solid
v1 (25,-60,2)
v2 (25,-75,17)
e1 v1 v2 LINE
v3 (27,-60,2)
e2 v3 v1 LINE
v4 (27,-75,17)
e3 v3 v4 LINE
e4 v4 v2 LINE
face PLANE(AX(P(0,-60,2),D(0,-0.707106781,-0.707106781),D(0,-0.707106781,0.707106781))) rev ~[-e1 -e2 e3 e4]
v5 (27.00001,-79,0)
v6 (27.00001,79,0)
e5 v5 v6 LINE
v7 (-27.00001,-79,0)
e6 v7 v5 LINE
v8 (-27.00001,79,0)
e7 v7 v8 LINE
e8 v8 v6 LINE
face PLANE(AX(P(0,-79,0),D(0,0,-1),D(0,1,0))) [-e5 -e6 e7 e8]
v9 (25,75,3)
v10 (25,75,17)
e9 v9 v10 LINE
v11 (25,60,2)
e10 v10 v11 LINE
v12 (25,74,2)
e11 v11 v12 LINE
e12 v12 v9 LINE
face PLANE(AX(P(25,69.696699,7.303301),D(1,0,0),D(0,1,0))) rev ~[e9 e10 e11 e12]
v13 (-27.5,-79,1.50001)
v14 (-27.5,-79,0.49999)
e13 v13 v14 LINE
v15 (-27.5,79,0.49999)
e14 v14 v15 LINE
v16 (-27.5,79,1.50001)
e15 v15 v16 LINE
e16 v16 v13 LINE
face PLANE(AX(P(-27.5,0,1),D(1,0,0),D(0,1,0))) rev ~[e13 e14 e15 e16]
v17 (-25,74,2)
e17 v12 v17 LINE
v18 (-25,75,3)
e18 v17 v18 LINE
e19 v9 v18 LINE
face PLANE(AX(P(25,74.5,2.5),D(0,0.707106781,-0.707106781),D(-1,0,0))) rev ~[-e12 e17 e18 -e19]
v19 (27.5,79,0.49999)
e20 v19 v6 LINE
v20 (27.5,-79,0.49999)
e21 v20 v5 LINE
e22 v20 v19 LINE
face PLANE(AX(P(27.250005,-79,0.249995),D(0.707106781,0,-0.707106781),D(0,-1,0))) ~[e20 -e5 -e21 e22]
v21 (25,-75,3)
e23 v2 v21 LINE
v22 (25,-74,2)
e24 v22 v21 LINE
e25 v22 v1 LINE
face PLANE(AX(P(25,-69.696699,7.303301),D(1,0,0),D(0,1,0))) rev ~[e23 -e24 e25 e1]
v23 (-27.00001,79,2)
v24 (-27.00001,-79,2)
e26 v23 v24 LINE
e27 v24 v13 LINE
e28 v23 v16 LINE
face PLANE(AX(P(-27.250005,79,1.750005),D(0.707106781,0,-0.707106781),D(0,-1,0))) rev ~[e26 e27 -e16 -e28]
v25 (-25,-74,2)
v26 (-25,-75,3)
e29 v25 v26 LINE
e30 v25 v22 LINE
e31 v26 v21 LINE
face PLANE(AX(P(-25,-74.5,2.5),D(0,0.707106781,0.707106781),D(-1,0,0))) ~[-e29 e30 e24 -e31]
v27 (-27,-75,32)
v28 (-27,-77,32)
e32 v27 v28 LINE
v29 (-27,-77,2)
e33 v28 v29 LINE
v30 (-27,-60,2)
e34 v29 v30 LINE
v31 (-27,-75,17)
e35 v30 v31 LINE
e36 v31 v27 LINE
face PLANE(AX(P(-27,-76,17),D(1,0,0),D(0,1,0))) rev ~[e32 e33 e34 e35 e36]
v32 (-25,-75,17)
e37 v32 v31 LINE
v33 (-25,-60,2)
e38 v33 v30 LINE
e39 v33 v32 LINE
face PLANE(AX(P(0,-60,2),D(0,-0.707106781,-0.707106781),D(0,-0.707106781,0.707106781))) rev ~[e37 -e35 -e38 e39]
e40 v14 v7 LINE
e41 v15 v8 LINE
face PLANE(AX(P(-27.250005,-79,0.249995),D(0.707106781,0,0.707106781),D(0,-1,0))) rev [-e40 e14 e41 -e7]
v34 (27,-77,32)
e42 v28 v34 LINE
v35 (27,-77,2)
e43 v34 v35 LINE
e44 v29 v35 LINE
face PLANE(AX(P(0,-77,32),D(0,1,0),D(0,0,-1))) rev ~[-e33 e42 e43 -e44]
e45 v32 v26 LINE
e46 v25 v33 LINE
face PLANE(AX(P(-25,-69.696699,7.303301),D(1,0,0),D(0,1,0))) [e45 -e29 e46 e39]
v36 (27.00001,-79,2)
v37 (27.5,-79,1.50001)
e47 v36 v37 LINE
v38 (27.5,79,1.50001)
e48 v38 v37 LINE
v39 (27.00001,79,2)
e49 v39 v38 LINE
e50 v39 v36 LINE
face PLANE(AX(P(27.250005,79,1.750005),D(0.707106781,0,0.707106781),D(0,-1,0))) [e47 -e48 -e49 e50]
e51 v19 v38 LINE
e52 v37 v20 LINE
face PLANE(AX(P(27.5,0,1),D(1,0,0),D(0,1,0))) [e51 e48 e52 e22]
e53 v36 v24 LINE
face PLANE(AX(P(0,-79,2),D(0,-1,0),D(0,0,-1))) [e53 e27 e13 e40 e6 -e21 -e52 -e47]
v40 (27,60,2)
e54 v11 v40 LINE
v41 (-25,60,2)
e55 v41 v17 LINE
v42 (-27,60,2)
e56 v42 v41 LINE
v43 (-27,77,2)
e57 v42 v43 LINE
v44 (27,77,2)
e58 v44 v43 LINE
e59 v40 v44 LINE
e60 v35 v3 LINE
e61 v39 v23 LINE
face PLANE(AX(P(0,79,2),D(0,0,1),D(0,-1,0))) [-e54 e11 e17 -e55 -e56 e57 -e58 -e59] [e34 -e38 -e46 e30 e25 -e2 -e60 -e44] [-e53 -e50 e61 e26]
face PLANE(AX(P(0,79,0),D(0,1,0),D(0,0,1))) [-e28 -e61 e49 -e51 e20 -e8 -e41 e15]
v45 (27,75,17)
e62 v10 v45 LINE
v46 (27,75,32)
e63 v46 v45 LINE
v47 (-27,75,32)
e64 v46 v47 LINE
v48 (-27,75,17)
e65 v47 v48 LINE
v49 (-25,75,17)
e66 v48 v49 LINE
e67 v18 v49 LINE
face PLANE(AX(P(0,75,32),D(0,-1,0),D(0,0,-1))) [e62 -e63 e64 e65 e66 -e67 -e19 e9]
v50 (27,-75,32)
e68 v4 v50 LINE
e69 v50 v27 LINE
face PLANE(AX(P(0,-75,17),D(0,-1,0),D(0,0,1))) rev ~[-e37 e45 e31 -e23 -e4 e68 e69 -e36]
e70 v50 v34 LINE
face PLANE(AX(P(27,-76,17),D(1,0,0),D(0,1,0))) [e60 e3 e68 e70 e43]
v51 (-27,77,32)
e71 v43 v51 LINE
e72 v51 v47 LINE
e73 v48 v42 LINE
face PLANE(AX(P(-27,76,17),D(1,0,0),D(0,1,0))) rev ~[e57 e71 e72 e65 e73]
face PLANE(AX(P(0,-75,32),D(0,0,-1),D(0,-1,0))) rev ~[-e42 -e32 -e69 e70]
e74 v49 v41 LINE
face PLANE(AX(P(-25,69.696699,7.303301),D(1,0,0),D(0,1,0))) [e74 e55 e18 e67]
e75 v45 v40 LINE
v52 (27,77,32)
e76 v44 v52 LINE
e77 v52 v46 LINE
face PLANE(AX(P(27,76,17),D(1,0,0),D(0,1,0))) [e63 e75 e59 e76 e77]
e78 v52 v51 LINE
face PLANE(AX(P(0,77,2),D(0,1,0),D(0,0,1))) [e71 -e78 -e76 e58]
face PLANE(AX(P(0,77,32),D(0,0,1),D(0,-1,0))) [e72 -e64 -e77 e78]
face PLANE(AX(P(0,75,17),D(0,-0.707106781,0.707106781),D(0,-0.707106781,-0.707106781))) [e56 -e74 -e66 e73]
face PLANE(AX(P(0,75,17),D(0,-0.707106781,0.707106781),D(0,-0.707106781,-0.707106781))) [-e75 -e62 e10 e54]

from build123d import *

# Parameters (mm, degrees)
F4_DEPTH = 27.5
F5_DEPTH = 27
F6_DEPTH = 25
F7_SIZE  = 1
F8_SIZE  = 0.49999


# Not quite as in the source:
# - a fillet or chamfer is up to 0.001 mm smaller than in the source, because OpenCascade refuses the exact size


with BuildPart() as f4:
    # F3 (on Right) → F4 (new body, symmetric)
    with BuildSketch(Plane.YZ):
        Polygon((-75, 2), (-77, 2), (-79, 2), (-79, 0), (-77, 0), (0, 0), (77, 0), (79, 0), (79, 2), (77, 2), (75, 2), (60, 2), (0, 2), (-60, 2), align=None)
    extrude(amount=F4_DEPTH, both=True)

    # F3 (on Right) → F5 (join, symmetric)
    with BuildSketch(Plane.YZ):
        Polygon((-75, 32), (-77, 32), (-77, 2), (-75, 2), (-75, 17), align=None)
        Polygon((75, 32), (75, 17), (75, 2), (77, 2), (77, 32), align=None)
        Polygon((-75, 17), (-75, 2), (-60, 2), align=None)
        Polygon((75, 17), (60, 2), (75, 2), align=None)
    extrude(amount=F5_DEPTH, both=True)

    # F3 (on Right) → F6 (cut, symmetric)
    with BuildSketch(Plane.YZ):
        Polygon((-75, 17), (-75, 2), (-60, 2), align=None)
        Polygon((75, 17), (60, 2), (75, 2), align=None)
    extrude(amount=F6_DEPTH, both=True, mode=Mode.SUBTRACT)

    # F7
    f7_edges = [f4.edges().sort_by_distance(p)[0] for p in [
        (0, -75, 2),
        (0, 75, 2),
    ]]
    chamfer(f7_edges, length=F7_SIZE)

    # F8 (size 0.5 in the source; OpenCascade refuses exactly that, so slightly less here)
    f8_edges = [f4.edges().sort_by_distance(p)[0] for p in [
        (27.5, 0, 2),
        (27.5, 0, 0),
        (-27.5, 0, 2),
        (-27.5, 0, 0),
    ]]
    chamfer(f8_edges, length=F8_SIZE)


solid = f4.part
